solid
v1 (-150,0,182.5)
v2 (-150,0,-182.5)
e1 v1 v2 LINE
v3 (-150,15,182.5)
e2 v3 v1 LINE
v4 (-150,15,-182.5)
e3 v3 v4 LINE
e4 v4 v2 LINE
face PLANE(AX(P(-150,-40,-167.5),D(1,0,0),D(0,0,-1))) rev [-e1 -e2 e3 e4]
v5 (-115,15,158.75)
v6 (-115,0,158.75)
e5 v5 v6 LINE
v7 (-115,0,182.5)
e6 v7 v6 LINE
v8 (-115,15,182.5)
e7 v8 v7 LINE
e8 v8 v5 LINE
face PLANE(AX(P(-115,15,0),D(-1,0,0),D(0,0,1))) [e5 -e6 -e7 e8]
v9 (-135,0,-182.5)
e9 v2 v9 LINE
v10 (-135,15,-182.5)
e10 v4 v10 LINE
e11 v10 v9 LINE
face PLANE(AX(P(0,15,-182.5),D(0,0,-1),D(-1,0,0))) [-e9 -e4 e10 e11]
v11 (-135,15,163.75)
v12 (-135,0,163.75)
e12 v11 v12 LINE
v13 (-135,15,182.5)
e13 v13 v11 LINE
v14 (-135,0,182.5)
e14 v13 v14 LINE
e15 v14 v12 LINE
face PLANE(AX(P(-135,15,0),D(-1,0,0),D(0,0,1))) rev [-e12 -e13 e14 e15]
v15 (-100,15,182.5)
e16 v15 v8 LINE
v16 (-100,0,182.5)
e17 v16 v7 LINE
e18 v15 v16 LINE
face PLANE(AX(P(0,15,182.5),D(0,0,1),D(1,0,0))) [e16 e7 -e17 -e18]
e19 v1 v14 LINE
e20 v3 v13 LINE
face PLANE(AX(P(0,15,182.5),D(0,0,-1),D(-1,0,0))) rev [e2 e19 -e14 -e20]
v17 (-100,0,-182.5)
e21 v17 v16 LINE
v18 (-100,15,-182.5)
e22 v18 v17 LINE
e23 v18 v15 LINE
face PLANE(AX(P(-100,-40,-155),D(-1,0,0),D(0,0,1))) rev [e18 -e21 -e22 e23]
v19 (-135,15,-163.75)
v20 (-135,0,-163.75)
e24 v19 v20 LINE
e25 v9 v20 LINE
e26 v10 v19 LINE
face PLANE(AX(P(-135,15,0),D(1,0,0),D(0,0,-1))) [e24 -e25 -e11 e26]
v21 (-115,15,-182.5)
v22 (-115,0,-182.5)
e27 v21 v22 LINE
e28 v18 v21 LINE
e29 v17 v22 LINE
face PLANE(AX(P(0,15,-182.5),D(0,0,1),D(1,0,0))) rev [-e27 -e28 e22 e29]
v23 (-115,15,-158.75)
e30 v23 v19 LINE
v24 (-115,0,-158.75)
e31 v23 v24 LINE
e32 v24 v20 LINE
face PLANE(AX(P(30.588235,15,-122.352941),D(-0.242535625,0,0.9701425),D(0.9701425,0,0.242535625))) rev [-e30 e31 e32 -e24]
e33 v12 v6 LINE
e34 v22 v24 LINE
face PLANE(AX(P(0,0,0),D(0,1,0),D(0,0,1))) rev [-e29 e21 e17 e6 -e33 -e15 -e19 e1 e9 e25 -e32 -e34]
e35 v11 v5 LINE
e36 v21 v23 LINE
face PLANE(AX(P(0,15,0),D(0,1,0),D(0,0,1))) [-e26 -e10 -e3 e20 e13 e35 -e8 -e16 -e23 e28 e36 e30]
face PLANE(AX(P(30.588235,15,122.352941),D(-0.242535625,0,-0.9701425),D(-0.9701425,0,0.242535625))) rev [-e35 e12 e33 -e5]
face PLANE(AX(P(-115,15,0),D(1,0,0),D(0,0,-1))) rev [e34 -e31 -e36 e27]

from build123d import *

# Parameters (mm, degrees)
BOSS_EXTRUDE1_DEPTH             = 15
BOSS_EXTRUDE2_REACH             = 1239.023
BOSS_EXTRUDE2_DIRECTION_2_REACH = 1239.023
CUT_EXTRUDE2_DEPTH              = 1238.578280352
CUT_EXTRUDE2_DEPTH_BACK         = 1238.578280352
SKETCH5_W                       = 40
SKETCH5_H                       = 40
CUT_EXTRUDE3_DEPTH              = 1238.578280352
BOSS_EXTRUDE4_DEPTH             = 75
CUT_EXTRUDE4_DEPTH              = 1241.107934819
CUT_EXTRUDE4_DEPTH_BACK         = 1241.107934819
SKETCH8_W                       = 15
SKETCH8_H                       = 73.7
FILLET1_R                       = 5
CUT_EXTRUDE5_DEPTH              = 1241.107934819
CUT_EXTRUDE5_DEPTH_BACK         = 1241.107934819
SKETCH9_W                       = 25
SKETCH9_H                       = 15
SKETCH9_W_2                     = 15
CUT_EXTRUDE6_DEPTH              = 1241.107934819
CUT_EXTRUDE6_DEPTH_BACK         = 1241.107934819
SKETCH10_W                      = 1728.920732784
SKETCH10_H                      = 178.853868908
SKETCH10_W_2                    = 1650
SKETCH10_H_2                    = 15
SKETCH11_W                      = 1852.680615207
SKETCH11_H                      = 1075.927112831
CUT_EXTRUDE7_DEPTH              = 1238.022635201


with BuildPart() as part:
    # Sketch1 → Boss-Extrude1 (new body)
    with BuildSketch(Plane(origin=(0, 0, 0), x_dir=(1, 0, 0), z_dir=(0, 1, 0))):
        Polygon((-450, 300), (-400, 300), (-200, 250), (600, 40), (1200, 40), (1200, -40), (600, -40), (-200, -250), (-400, -300), (-450, -300), align=None)
    extrude(amount=BOSS_EXTRUDE1_DEPTH)

    # Boss-Extrude2: up to this face of the body (flat: up to its plane)
    boss_extrude2_end = Plane(part.part.faces().sort_by_distance((-425, 7.5, 300))[0])
    # Sketch2 → Boss-Extrude2 (add, up to the picked face)
    with BuildSketch(Plane.XY, mode=Mode.PRIVATE) as boss_extrude2_sk1:
        with BuildLine():
            Line((-425, 0), (-450, 0))
            Line((-450, 0), (-450, -40))
            Line((-450, -40), (-440, -40))
            Line((-440, -40), (-440, -15))
            ThreePointArc((-440, -15), (-435.606601718, -4.393398282), (-425, 0))
        make_face()
    boss_extrude2_tool1 = split(extrude(boss_extrude2_sk1.sketch, amount=BOSS_EXTRUDE2_REACH, mode=Mode.PRIVATE), bisect_by=boss_extrude2_end, keep=Keep.BOTH, mode=Mode.PRIVATE)
    # Sketch2 → Boss-Extrude2 (add, up to the picked face)
    with BuildSketch(Plane.XY, mode=Mode.PRIVATE) as boss_extrude2_sk2:
        with BuildLine():
            Line((-400, 0), (-425, 0))
            ThreePointArc((-425, 0), (-414.393398282, -4.393398282), (-410, -15))
            Line((-410, -15), (-410, -40))
            Line((-410, -40), (-400, -40))
            Line((-400, -40), (-400, 0))
        make_face()
    boss_extrude2_tool2 = split(extrude(boss_extrude2_sk2.sketch, amount=BOSS_EXTRUDE2_REACH, mode=Mode.PRIVATE), bisect_by=boss_extrude2_end, keep=Keep.BOTH, mode=Mode.PRIVATE)
    add(boss_extrude2_tool1.solids().sort_by(Axis((-444.100555, -18.206662, 0), (0, 0, 1)))[0])
    add(boss_extrude2_tool2.solids().sort_by(Axis((-405.899445, -18.206662, 0), (0, 0, 1)))[0])

    # Boss-Extrude2 direction 2: up to this face of the body (flat: up to its plane)
    boss_extrude2_direction_2_end = Plane(part.part.faces().sort_by_distance((-425, 7.5, -300))[0])
    # Sketch2 → Boss-Extrude2 direction 2 (add, up to the picked face)
    with BuildSketch(Plane.XY, mode=Mode.PRIVATE) as boss_extrude2_direction_2_sk1:
        with BuildLine():
            Line((-425, 0), (-450, 0))
            Line((-450, 0), (-450, -40))
            Line((-450, -40), (-440, -40))
            Line((-440, -40), (-440, -15))
            ThreePointArc((-440, -15), (-435.606601718, -4.393398282), (-425, 0))
        make_face()
    boss_extrude2_direction_2_tool1 = split(extrude(boss_extrude2_direction_2_sk1.sketch, amount=-BOSS_EXTRUDE2_DIRECTION_2_REACH, mode=Mode.PRIVATE), bisect_by=boss_extrude2_direction_2_end, keep=Keep.BOTH, mode=Mode.PRIVATE)
    # Sketch2 → Boss-Extrude2 direction 2 (add, up to the picked face)
    with BuildSketch(Plane.XY, mode=Mode.PRIVATE) as boss_extrude2_direction_2_sk2:
        with BuildLine():
            Line((-400, 0), (-425, 0))
            ThreePointArc((-425, 0), (-414.393398282, -4.393398282), (-410, -15))
            Line((-410, -15), (-410, -40))
            Line((-410, -40), (-400, -40))
            Line((-400, -40), (-400, 0))
        make_face()
    boss_extrude2_direction_2_tool2 = split(extrude(boss_extrude2_direction_2_sk2.sketch, amount=-BOSS_EXTRUDE2_DIRECTION_2_REACH, mode=Mode.PRIVATE), bisect_by=boss_extrude2_direction_2_end, keep=Keep.BOTH, mode=Mode.PRIVATE)
    add(boss_extrude2_direction_2_tool1.solids().sort_by(Axis((-444.100555, -18.206662, 0), (0, 0, -1)))[0])
    add(boss_extrude2_direction_2_tool2.solids().sort_by(Axis((-405.899445, -18.206662, 0), (0, 0, -1)))[0])

    # Sketch4 → Cut-Extrude2 (cut, two sides: drawn at the far end of the back side and taken through both)
    with BuildSketch(Plane(origin=(0, 0, 0), x_dir=(1, 0, 0), z_dir=(0, 1, 0)).offset(-CUT_EXTRUDE2_DEPTH_BACK)):
        Polygon((-450, 230), (-400, 230), (-150, 167.5), (-150, -167.5), (-400, -230), (-450, -230), align=None)
        Polygon((-100, 155), (-100, -155), (520, 0), align=None)
    extrude(amount=CUT_EXTRUDE2_DEPTH + CUT_EXTRUDE2_DEPTH_BACK, mode=Mode.SUBTRACT)

    # Sketch5 → Cut-Extrude3 (cut, through all)
    with BuildSketch(Plane(origin=(0, 0, 0), x_dir=(0, 0, -1), z_dir=(1, 0, 0))):
        with Locations((-265, -20)):
            Rectangle(SKETCH5_W, SKETCH5_H)
        with Locations((265, -20)):
            Rectangle(SKETCH5_W, SKETCH5_H)
    extrude(amount=-CUT_EXTRUDE3_DEPTH, mode=Mode.SUBTRACT)

    # Sketch7 → Boss-Extrude4 (add)
    with BuildSketch(Plane(origin=(1200, 0, 0), x_dir=(0, 0, -1), z_dir=(1, 0, 0))):
        with BuildLine():
            Line((-87.5, 50), (-40, 15))
            Line((-40, 15), (40, 15))
            Line((40, 15), (87.5, 50))
            Line((87.5, 50), (87.5, 88.7))
            Line((87.5, 88.7), (58.5, 88.7))
            Line((58.5, 88.7), (58.5, 63.2))
            Line((58.5, 63.2), (48.5, 63.2))
            Line((48.5, 63.2), (48.5, 88.7))
            Line((48.5, 88.7), (20, 88.7))
            Line((20, 88.7), (20, 50))
            ThreePointArc((20, 50), (0, 30), (-20, 50))
            Line((-20, 50), (-20, 88.7))
            Line((-20, 88.7), (-63, 88.7))
            Line((-63, 88.7), (-63, 63.2))
            Line((-63, 63.2), (-73, 63.2))
            Line((-73, 63.2), (-73, 88.7))
            Line((-73, 88.7), (-87.5, 88.7))
            Line((-87.5, 88.7), (-87.5, 50))
        make_face()
    extrude(amount=-BOSS_EXTRUDE4_DEPTH)

    # Sketch8 → Cut-Extrude4 (cut, two sides: drawn at the far end of the back side and taken through both)
    with BuildSketch(Plane.XY.offset(-CUT_EXTRUDE4_DEPTH_BACK)):
        with Locations((1147.5, 51.85)):
            Rectangle(SKETCH8_W, SKETCH8_H)
        with Locations((1177.5, 51.85)):
            Rectangle(SKETCH8_W, SKETCH8_H)
    extrude(amount=CUT_EXTRUDE4_DEPTH + CUT_EXTRUDE4_DEPTH_BACK, mode=Mode.SUBTRACT)

    # Fillet1
    fillet1_edges = [part.edges().sort_by_distance(p)[0] for p in [
        (1192.5, 50, 87.5),
        (1162.5, 50, 87.5),
        (1132.5, 50, 87.5),
        (1192.5, 50, -87.5),
        (1162.5, 50, -87.5),
        (1132.5, 50, -87.5),
        (1192.5, 88.7, -87.5),
        (1162.5, 88.7, -87.5),
        (1132.5, 88.7, -87.5),
        (1132.5, 88.7, -58.5),
        (1162.5, 88.7, -58.5),
        (1192.5, 88.7, -58.5),
        (1192.5, 88.7, -48.5),
        (1162.5, 88.7, -48.5),
        (1132.5, 88.7, -48.5),
        (1192.5, 88.7, -20),
        (1162.5, 88.7, -20),
        (1132.5, 88.7, -20),
        (1192.5, 88.7, 63),
        (1162.5, 88.7, 63),
        (1132.5, 88.7, 63),
        (1132.5, 88.7, 87.5),
        (1162.5, 88.7, 87.5),
        (1192.5, 88.7, 87.5),
        (1192.5, 88.7, 73),
        (1162.5, 88.7, 73),
        (1132.5, 88.7, 73),
        (1192.5, 88.7, 20),
        (1162.5, 88.7, 20),
        (1132.5, 88.7, 20),
        (600, 7.5, 40),
        (600, 7.5, -40),
        (520, 7.5, 0),
        (-440, -40, -292.5),
        (-440, -40, -237.5),
        (-400, -40, -292.5),
        (-400, -40, -237.5),
        (-450, -40, -237.5),
        (-410, -40, -237.5),
        (-450, -40, -292.5),
        (-410, -40, -292.5),
        (-150, 7.5, 167.5),
        (-100, 7.5, 155),
        (-150, 7.5, -167.5),
        (-100, 7.5, -155),
        (-450, -40, 237.5),
        (-410, -40, 237.5),
        (-440, -40, 237.5),
        (-400, -40, 237.5),
        (-450, -40, 292.5),
        (-440, -40, 292.5),
        (-400, -40, 292.5),
        (-410, -40, 292.5),
    ]]
    fillet(fillet1_edges, radius=FILLET1_R - 0.0001)  # a hair under: the kernel refuses the full size

    # Sketch9 → Cut-Extrude5 (cut, two sides: drawn at the far end of the back side and taken through both)
    with BuildSketch(Plane(origin=(0, 0, 0), x_dir=(1, 0, 0), z_dir=(0, 1, 0)).offset(-CUT_EXTRUDE5_DEPTH_BACK)):
        with Locations((-425, -292.5)):
            Rectangle(SKETCH9_W, SKETCH9_H)
        with Locations((1192.5, -32.5)):
            Rectangle(SKETCH9_W_2, SKETCH9_H)
        with Locations((1192.5, 32.5)):
            Rectangle(SKETCH9_W_2, SKETCH9_H)
        with Locations((1162.5, 32.5)):
            Rectangle(SKETCH9_W_2, SKETCH9_H)
        with Locations((1132.5, 32.5)):
            Rectangle(SKETCH9_W_2, SKETCH9_H)
        with Locations((1132.5, -32.5)):
            Rectangle(SKETCH9_W_2, SKETCH9_H)
        with Locations((1162.5, -32.5)):
            Rectangle(SKETCH9_W_2, SKETCH9_H)
        with Locations((-425, -237.5)):
            Rectangle(SKETCH9_W, SKETCH9_H)
        with Locations((-425, 237.5)):
            Rectangle(SKETCH9_W, SKETCH9_H)
        with Locations((-425, 292.5)):
            Rectangle(SKETCH9_W, SKETCH9_H)
    extrude(amount=CUT_EXTRUDE5_DEPTH + CUT_EXTRUDE5_DEPTH_BACK, mode=Mode.SUBTRACT)


with BuildPart() as cut_extrude5_piece_1:
    # of the separate pieces the step leaves, piece 1, a body of its own (cut_extrude5_pieces)
    add(part.part.solids().sort_by_distance((-400, -35.0001, -300))[0])


with BuildPart() as cut_extrude5_piece_2:
    # of the separate pieces the step leaves, piece 2, a body of its own (cut_extrude5_pieces)
    add(part.part.solids().sort_by_distance((1170, 48.501289589, 85.46603587))[0])


with BuildPart() as cut_extrude5_piece_3:
    # of the separate pieces the step leaves, piece 3, a body of its own (cut_extrude5_pieces)
    add(part.part.solids().sort_by_distance((1170, 48.501289589, -85.46603587))[0])


with BuildPart() as cut_extrude5_piece_4:
    # of the separate pieces the step leaves, piece 4, a body of its own (cut_extrude5_pieces)
    add(part.part.solids().sort_by_distance((1125, 83.7001, 73))[0])


with BuildPart() as cut_extrude5_piece_5:
    # of the separate pieces the step leaves, piece 5, a body of its own (cut_extrude5_pieces)
    add(part.part.solids().sort_by_distance((1200, 48.501289589, 85.46603587))[0])


with BuildPart() as cut_extrude5_piece_6:
    # of the separate pieces the step leaves, piece 6, a body of its own (cut_extrude5_pieces)
    add(part.part.solids().sort_by_distance((1200, 48.501289589, -85.46603587))[0])


with BuildPart() as cut_extrude5_piece_7:
    # of the separate pieces the step leaves, piece 7, a body of its own (cut_extrude5_pieces)
    add(part.part.solids().sort_by_distance((1125, 88.7, -40))[0])


with BuildPart() as cut_extrude6_tool:
    # Sketch10 → Cut-Extrude6 (new, two sides: drawn at the far end of the back side and taken through both)
    with BuildSketch(Plane.XY.offset(-CUT_EXTRUDE6_DEPTH_BACK)):
        with Locations((378.379601058, 20.599691165)):
            Rectangle(SKETCH10_W, SKETCH10_H)
        with Locations((375, 7.5)):
            Rectangle(SKETCH10_W_2, SKETCH10_H_2, mode=Mode.SUBTRACT)
    extrude(amount=CUT_EXTRUDE6_DEPTH + CUT_EXTRUDE6_DEPTH_BACK)


with BuildPart() as cut_extrude5_piece_1_1:
    add(cut_extrude5_piece_1.part)

    # Cut-Extrude6: cut by cut_extrude6_tool
    add(cut_extrude6_tool.part, mode=Mode.SUBTRACT)

    # Sketch11 → Cut-Extrude7 (cut, through all)
    # profile 1 of 5: a face of its own
    with BuildSketch(Plane(origin=(0, 0, 0), x_dir=(1, 0, 0), z_dir=(0, 1, 0))):
        with Locations((324.970767393, -26.108881651)):
            Rectangle(SKETCH11_W, SKETCH11_H)
        Polygon((309.276307823, -116.314969197), (-450, -315.625), (-450, -242.5), (-450, -230), (-400, -230), (-150, -167.5), (-150, 0), (-150, 167.5), (-150, 182.5), (-135, 182.5), (-135, 163.75), (-115, 158.75), (-115, 182.5), (-100, 182.5), (-100, 155), (-100, 0), (-100, -155), (293.601058917, -56.599735271), (308.154197556, -52.961450611), (311.917995324, -67.299727825), (319.976300377, -97.99803279), (323.784772304, -112.50649727), align=None, mode=Mode.SUBTRACT)
    # profile 2 of 5: a face of its own
    with BuildSketch(Plane(origin=(0, 0, 0), x_dir=(1, 0, 0), z_dir=(0, 1, 0))):
        Polygon((-450, -242.5), (-450, -315.625), (309.276307823, -116.314969197), (305.467835897, -101.806504716), (319.976300377, -97.99803279), (311.917995324, -67.299727825), (297.409530844, -71.108199751), (293.601058917, -56.599735271), (-100, -155), (-100, -182.5), (-115, -182.5), (-115, -158.75), (-135, -163.75), (-135, -182.5), (-150, -182.5), (-150, -167.5), (-400, -230), align=None)
    # profile 3 of 5: a face of its own
    with BuildSketch(Plane(origin=(0, 0, 0), x_dir=(1, 0, 0), z_dir=(0, 1, 0))):
        Polygon((-450, -230), (-450, -242.5), (-400, -230), align=None)
    # profile 4 of 5: a face of its own
    with BuildSketch(Plane(origin=(0, 0, 0), x_dir=(1, 0, 0), z_dir=(0, 1, 0))):
        Polygon((305.467835897, -101.806504716), (309.276307823, -116.314969197), (323.784772304, -112.50649727), (319.976300377, -97.99803279), align=None)
    # profile 5 of 5: a face of its own
    with BuildSketch(Plane(origin=(0, 0, 0), x_dir=(1, 0, 0), z_dir=(0, 1, 0))):
        Polygon((297.409530844, -71.108199751), (311.917995324, -67.299727825), (308.154197556, -52.961450611), (293.601058917, -56.599735271), align=None)
    extrude(amount=CUT_EXTRUDE7_DEPTH, mode=Mode.SUBTRACT)


with BuildPart() as cut_extrude5_piece_2_1:
    add(cut_extrude5_piece_2.part)

    # Cut-Extrude6: cut by cut_extrude6_tool
    add(cut_extrude6_tool.part, mode=Mode.SUBTRACT)


with BuildPart() as cut_extrude5_piece_3_1:
    add(cut_extrude5_piece_3.part)

    # Cut-Extrude6: cut by cut_extrude6_tool
    add(cut_extrude6_tool.part, mode=Mode.SUBTRACT)


with BuildPart() as cut_extrude5_piece_4_1:
    add(cut_extrude5_piece_4.part)

    # Cut-Extrude6: cut by cut_extrude6_tool
    add(cut_extrude6_tool.part, mode=Mode.SUBTRACT)


with BuildPart() as cut_extrude5_piece_5_1:
    add(cut_extrude5_piece_5.part)

    # Cut-Extrude6: cut by cut_extrude6_tool
    add(cut_extrude6_tool.part, mode=Mode.SUBTRACT)


with BuildPart() as cut_extrude5_piece_6_1:
    add(cut_extrude5_piece_6.part)

    # Cut-Extrude6: cut by cut_extrude6_tool
    add(cut_extrude6_tool.part, mode=Mode.SUBTRACT)


with BuildPart() as cut_extrude5_piece_7_1:
    add(cut_extrude5_piece_7.part)

    # Cut-Extrude6: cut by cut_extrude6_tool
    add(cut_extrude6_tool.part, mode=Mode.SUBTRACT)


solid = cut_extrude5_piece_1_1.part
